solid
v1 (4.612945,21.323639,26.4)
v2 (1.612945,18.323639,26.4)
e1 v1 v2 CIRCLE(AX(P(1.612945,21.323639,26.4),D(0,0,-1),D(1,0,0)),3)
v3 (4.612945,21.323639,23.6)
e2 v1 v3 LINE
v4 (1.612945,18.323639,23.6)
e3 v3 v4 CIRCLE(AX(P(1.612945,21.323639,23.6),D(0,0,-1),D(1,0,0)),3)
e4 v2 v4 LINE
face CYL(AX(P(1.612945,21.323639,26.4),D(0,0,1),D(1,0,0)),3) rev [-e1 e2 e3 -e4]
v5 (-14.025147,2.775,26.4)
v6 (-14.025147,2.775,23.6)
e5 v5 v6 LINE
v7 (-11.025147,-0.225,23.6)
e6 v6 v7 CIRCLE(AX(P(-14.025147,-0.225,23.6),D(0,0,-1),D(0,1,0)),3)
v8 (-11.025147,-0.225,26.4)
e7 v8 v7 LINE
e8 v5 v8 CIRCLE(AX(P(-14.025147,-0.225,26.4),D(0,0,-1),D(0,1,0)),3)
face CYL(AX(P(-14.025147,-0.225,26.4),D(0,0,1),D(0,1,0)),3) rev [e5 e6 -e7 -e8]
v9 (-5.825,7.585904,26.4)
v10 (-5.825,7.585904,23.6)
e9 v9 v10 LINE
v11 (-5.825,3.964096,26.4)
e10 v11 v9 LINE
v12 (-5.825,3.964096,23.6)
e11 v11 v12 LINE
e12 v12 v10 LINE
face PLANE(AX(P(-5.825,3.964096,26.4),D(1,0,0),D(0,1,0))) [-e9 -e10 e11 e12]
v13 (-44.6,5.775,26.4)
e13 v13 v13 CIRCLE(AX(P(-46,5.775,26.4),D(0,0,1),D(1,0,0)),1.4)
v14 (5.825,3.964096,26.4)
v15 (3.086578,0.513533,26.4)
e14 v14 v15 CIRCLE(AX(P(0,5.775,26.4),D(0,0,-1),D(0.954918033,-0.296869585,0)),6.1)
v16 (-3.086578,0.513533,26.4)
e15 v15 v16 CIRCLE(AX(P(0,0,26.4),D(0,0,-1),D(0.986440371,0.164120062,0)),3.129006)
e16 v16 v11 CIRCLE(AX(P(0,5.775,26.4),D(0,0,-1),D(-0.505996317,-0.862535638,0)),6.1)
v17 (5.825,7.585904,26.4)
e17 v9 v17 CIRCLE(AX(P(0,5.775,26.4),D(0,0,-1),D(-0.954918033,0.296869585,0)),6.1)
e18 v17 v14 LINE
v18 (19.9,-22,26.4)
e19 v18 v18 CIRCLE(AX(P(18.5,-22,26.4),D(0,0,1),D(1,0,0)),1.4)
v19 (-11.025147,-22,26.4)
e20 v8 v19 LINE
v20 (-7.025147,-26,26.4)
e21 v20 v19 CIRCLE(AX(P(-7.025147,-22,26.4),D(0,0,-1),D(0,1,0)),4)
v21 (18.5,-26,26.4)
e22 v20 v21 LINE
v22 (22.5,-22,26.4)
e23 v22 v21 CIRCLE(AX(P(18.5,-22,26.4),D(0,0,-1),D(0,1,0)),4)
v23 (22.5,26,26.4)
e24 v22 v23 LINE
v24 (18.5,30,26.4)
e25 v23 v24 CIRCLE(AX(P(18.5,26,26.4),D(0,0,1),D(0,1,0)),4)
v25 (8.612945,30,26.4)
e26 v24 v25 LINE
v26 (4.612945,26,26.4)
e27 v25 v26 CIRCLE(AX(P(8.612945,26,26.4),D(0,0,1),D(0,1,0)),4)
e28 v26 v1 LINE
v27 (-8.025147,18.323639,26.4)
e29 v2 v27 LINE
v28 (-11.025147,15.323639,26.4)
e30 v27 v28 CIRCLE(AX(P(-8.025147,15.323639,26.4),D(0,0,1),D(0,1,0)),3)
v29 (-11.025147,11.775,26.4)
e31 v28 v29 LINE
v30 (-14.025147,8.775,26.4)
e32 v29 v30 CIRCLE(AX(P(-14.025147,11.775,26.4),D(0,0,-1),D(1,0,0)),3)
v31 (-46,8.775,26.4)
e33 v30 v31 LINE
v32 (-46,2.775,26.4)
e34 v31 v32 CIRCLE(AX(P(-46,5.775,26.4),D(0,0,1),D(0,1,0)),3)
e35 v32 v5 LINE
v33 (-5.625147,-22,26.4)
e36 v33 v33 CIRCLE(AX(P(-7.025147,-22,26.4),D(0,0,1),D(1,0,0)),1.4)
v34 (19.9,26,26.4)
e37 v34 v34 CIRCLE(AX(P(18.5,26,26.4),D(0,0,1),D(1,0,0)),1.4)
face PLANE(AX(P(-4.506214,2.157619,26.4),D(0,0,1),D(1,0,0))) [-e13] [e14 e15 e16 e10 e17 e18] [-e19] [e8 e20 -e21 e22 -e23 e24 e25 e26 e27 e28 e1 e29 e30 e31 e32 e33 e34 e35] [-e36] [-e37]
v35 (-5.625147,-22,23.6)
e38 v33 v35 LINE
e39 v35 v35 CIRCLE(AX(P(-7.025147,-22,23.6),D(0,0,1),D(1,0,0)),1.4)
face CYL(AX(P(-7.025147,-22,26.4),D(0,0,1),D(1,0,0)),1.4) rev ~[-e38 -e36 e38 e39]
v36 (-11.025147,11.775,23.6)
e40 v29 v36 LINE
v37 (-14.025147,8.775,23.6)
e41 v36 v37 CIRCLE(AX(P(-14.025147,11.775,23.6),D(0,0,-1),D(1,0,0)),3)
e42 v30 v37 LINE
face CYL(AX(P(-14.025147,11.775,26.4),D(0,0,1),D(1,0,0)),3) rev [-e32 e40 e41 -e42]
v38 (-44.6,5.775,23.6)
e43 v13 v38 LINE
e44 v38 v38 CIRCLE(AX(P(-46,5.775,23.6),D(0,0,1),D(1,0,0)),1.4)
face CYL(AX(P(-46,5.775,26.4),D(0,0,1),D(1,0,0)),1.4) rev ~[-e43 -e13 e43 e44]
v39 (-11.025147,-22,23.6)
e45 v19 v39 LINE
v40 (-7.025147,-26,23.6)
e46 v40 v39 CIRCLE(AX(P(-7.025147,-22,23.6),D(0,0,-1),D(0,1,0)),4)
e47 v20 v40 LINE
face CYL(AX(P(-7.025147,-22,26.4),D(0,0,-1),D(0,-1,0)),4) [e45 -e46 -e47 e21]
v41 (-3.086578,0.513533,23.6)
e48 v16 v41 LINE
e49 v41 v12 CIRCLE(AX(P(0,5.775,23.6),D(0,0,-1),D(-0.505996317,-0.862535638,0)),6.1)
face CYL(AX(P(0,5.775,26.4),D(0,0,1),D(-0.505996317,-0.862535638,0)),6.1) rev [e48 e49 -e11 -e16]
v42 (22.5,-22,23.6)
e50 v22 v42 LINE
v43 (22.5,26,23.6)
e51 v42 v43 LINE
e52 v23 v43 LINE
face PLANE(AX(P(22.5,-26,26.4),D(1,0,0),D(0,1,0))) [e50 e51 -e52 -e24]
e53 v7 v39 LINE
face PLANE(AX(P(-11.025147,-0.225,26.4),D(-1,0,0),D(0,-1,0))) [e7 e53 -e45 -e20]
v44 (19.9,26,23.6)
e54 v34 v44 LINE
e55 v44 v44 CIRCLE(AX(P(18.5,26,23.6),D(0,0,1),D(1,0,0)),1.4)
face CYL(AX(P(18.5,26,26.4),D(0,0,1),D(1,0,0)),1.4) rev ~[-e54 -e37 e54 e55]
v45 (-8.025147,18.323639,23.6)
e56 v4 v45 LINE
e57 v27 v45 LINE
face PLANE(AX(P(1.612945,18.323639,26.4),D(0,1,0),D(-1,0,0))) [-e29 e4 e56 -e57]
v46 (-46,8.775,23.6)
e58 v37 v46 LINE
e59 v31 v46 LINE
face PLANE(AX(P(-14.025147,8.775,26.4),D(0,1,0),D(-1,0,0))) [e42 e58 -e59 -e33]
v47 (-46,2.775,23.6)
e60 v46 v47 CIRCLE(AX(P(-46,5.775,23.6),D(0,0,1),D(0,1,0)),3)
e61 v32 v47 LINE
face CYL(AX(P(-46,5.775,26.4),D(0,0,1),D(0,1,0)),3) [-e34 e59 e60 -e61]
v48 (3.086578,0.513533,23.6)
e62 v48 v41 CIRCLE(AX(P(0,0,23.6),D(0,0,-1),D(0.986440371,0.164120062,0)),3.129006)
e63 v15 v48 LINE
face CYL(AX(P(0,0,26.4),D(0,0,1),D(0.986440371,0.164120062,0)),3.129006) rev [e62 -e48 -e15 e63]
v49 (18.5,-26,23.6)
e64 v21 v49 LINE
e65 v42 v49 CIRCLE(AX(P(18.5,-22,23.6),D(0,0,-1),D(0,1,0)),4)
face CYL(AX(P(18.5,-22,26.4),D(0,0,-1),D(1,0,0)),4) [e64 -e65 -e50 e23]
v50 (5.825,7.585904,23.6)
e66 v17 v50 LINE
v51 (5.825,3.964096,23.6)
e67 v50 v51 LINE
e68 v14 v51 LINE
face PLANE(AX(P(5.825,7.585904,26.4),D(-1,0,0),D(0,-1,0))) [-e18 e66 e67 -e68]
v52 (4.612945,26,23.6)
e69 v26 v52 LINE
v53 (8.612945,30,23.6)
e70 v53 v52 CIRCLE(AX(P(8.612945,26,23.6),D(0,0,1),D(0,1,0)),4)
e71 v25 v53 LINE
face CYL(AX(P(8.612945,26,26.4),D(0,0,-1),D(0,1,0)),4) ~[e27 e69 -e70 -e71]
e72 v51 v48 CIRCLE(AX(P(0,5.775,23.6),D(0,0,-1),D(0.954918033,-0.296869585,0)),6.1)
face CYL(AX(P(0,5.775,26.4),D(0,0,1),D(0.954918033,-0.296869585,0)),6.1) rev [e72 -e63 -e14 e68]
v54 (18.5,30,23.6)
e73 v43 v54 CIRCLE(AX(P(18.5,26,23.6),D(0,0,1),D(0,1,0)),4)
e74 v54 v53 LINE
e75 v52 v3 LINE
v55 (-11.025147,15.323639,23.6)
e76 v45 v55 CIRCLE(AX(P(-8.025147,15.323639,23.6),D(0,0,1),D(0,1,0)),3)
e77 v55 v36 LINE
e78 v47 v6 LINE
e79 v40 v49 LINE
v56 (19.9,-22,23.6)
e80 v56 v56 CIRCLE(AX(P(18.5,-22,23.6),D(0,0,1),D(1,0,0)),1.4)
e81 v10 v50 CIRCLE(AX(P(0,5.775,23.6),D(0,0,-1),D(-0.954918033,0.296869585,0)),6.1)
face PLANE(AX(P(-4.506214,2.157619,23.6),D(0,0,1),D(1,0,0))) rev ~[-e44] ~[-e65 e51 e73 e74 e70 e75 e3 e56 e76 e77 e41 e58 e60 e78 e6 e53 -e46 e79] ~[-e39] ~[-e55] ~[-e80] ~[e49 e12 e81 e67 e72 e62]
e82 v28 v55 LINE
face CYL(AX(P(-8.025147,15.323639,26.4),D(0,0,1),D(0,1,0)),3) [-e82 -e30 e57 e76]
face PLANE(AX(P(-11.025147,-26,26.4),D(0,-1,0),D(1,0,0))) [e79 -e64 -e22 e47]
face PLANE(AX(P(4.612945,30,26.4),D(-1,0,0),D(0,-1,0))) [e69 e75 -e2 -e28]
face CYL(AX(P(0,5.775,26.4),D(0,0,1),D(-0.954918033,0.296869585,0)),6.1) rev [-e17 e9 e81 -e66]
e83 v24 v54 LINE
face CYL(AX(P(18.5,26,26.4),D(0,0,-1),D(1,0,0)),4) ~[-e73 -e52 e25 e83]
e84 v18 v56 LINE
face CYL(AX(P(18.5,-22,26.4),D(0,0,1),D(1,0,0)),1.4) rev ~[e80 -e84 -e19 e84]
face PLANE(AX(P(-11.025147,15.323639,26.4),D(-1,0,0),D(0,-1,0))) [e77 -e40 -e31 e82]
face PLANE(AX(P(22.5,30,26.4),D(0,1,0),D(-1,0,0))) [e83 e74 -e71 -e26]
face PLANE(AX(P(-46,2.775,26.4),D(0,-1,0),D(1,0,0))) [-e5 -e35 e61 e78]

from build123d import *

# Parameters (mm, degrees)
F0_W     = 11.65
F0_H     = 23.75
F1_DEPTH = 20.4
F3_DEPTH = 6
F5_START = -0.8
F4_W     = 11.65
F4_H     = 4.2
F5_DEPTH = 2
F6_R     = 0.5
F7_R     = 1
F8_R     = 1.4
F9_DEPTH = 2.8
F10_R    = 4


# Not quite as in the source:
# - a feature names something its author has since deleted; it is built from what else it names


with BuildPart() as f1:
    # F0 (on Top) → F1 (new body)
    with BuildSketch(Plane.XY):
        Rectangle(F0_W, F0_H)
    extrude(amount=F1_DEPTH)

    # F2 (on face) → F3 (join)
    with BuildSketch(Plane.XY.offset(20.4)):
        with BuildLine():
            Line((5.825, 3.9640955299), (5.825, 7.5859044701))
            ThreePointArc((5.825, 7.5859044701), (0, 11.875), (-5.825, 7.5859044701))
            Line((-5.825, 7.5859044701), (-5.825, 3.9640955299))
            ThreePointArc((-5.825, 3.9640955299), (-4.7781429098, 1.9829886164), (-3.0865775367, 0.5135326087))
            ThreePointArc((-3.0865775367, 0.5135326087), (0, -3.1), (3.0865775367, 0.5135326087))
            ThreePointArc((3.0865775367, 0.5135326087), (4.7781429098, 1.9829886164), (5.825, 3.9640955299))
        make_face()
    extrude(amount=F3_DEPTH)

    # F4 (on face) → F5 (join)
    with BuildSketch(Plane.XY.offset(20.4).offset(F5_START)):
        with Locations((0, -13.975)):
            Rectangle(F4_W, F4_H)
        with Locations((0, 13.975)):
            Rectangle(F4_W, F4_H)
    extrude(amount=-F5_DEPTH)

    # F6
    f6_edges = [f1.edges().sort_by_distance(p)[0] for p in [
        (5.825, 11.875, 8.8),
        (5.825, -11.875, 8.8),
        (-5.825, -11.875, 8.8),
        (-5.825, 11.875, 8.8),
    ]]
    fillet(f6_edges, radius=F6_R)

    # F7
    f7_edges = [f1.edges().sort_by_distance(p)[0] for p in [
        (-5.825, 16.075, 18.6),
        (5.825, 16.075, 18.6),
        (5.825, -16.075, 18.6),
        (-5.825, -16.075, 18.6),
    ]]
    fillet(f7_edges, radius=F7_R)


with BuildPart() as f9:
    # F8 (on face) → F9 (new body)
    with BuildSketch(Plane.XY.offset(26.4)):
        with BuildLine():
            Line((22.5, -26), (22.5, 30))
            Line((22.5, 30), (4.6129450202, 30))
            Line((4.6129450202, 30), (4.6129450202, 21.3236394078))
            ThreePointArc((4.6129450202, 21.3236394078), (3.7342653638, 19.2023190642), (1.6129450202, 18.3236394078))
            Line((1.6129450202, 18.3236394078), (-8.0251465812, 18.3236394078))
            ThreePointArc((-8.0251465812, 18.3236394078), (-10.1464669248, 17.4449597513), (-11.0251465812, 15.3236394078))
            Line((-11.0251465812, 15.3236394078), (-11.0251465812, 11.775))
            ThreePointArc((-11.0251465812, 11.775), (-11.9038262377, 9.6536796564), (-14.0251465812, 8.775))
            Line((-14.0251465812, 8.775), (-46, 8.775))
            ThreePointArc((-46, 8.775), (-49, 5.775), (-46, 2.775))
            Line((-46, 2.775), (-14.0251465812, 2.775))
            ThreePointArc((-14.0251465812, 2.775), (-11.9038262377, 1.8963203436), (-11.0251465812, -0.225))
            Line((-11.0251465812, -0.225), (-11.0251465812, -15.0673655123))
            Line((-11.0251465812, -15.0673655123), (-11.0251465812, -26))
            Line((-11.0251465812, -26), (22.5, -26))
        make_face()
        with Locations((-7.0251465812, -22)):
            Circle(F8_R, mode=Mode.SUBTRACT)
        with Locations((18.5, -22)):
            Circle(F8_R, mode=Mode.SUBTRACT)
        with Locations((-46, 5.775)):
            Circle(F8_R, mode=Mode.SUBTRACT)
        with BuildLine():
            ThreePointArc((5.825, 3.9640955299), (4.7781429098, 1.9829886164), (3.0865775367, 0.5135326087))
            ThreePointArc((3.0865775367, 0.5135326087), (0, -3.1290056936), (-3.0865775367, 0.5135326087))
            ThreePointArc((-3.0865775367, 0.5135326087), (-4.7781429098, 1.9829886164), (-5.825, 3.9640955299))
            Line((-5.825, 3.9640955299), (-5.825, 7.5859044701))
            ThreePointArc((-5.825, 7.5859044701), (0, 11.875), (5.825, 7.5859044701))
            Line((5.825, 7.5859044701), (5.825, 3.9640955299))
        make_face(mode=Mode.SUBTRACT)
        with Locations((18.5, 26)):
            Circle(F8_R, mode=Mode.SUBTRACT)
    extrude(amount=-F9_DEPTH)

    # F10
    f10_edges = [f9.edges().sort_by_distance(p)[0] for p in [
        (22.5, 30, 25),
        (-11.025147, -26, 25),
        (22.5, -26, 25),
        (4.612945, 30, 25),
    ]]
    fillet(f10_edges, radius=F10_R)


with BuildPart() as f11_1:
    # F11: copy of F9
    add(f9.part)


solid = f9.part
